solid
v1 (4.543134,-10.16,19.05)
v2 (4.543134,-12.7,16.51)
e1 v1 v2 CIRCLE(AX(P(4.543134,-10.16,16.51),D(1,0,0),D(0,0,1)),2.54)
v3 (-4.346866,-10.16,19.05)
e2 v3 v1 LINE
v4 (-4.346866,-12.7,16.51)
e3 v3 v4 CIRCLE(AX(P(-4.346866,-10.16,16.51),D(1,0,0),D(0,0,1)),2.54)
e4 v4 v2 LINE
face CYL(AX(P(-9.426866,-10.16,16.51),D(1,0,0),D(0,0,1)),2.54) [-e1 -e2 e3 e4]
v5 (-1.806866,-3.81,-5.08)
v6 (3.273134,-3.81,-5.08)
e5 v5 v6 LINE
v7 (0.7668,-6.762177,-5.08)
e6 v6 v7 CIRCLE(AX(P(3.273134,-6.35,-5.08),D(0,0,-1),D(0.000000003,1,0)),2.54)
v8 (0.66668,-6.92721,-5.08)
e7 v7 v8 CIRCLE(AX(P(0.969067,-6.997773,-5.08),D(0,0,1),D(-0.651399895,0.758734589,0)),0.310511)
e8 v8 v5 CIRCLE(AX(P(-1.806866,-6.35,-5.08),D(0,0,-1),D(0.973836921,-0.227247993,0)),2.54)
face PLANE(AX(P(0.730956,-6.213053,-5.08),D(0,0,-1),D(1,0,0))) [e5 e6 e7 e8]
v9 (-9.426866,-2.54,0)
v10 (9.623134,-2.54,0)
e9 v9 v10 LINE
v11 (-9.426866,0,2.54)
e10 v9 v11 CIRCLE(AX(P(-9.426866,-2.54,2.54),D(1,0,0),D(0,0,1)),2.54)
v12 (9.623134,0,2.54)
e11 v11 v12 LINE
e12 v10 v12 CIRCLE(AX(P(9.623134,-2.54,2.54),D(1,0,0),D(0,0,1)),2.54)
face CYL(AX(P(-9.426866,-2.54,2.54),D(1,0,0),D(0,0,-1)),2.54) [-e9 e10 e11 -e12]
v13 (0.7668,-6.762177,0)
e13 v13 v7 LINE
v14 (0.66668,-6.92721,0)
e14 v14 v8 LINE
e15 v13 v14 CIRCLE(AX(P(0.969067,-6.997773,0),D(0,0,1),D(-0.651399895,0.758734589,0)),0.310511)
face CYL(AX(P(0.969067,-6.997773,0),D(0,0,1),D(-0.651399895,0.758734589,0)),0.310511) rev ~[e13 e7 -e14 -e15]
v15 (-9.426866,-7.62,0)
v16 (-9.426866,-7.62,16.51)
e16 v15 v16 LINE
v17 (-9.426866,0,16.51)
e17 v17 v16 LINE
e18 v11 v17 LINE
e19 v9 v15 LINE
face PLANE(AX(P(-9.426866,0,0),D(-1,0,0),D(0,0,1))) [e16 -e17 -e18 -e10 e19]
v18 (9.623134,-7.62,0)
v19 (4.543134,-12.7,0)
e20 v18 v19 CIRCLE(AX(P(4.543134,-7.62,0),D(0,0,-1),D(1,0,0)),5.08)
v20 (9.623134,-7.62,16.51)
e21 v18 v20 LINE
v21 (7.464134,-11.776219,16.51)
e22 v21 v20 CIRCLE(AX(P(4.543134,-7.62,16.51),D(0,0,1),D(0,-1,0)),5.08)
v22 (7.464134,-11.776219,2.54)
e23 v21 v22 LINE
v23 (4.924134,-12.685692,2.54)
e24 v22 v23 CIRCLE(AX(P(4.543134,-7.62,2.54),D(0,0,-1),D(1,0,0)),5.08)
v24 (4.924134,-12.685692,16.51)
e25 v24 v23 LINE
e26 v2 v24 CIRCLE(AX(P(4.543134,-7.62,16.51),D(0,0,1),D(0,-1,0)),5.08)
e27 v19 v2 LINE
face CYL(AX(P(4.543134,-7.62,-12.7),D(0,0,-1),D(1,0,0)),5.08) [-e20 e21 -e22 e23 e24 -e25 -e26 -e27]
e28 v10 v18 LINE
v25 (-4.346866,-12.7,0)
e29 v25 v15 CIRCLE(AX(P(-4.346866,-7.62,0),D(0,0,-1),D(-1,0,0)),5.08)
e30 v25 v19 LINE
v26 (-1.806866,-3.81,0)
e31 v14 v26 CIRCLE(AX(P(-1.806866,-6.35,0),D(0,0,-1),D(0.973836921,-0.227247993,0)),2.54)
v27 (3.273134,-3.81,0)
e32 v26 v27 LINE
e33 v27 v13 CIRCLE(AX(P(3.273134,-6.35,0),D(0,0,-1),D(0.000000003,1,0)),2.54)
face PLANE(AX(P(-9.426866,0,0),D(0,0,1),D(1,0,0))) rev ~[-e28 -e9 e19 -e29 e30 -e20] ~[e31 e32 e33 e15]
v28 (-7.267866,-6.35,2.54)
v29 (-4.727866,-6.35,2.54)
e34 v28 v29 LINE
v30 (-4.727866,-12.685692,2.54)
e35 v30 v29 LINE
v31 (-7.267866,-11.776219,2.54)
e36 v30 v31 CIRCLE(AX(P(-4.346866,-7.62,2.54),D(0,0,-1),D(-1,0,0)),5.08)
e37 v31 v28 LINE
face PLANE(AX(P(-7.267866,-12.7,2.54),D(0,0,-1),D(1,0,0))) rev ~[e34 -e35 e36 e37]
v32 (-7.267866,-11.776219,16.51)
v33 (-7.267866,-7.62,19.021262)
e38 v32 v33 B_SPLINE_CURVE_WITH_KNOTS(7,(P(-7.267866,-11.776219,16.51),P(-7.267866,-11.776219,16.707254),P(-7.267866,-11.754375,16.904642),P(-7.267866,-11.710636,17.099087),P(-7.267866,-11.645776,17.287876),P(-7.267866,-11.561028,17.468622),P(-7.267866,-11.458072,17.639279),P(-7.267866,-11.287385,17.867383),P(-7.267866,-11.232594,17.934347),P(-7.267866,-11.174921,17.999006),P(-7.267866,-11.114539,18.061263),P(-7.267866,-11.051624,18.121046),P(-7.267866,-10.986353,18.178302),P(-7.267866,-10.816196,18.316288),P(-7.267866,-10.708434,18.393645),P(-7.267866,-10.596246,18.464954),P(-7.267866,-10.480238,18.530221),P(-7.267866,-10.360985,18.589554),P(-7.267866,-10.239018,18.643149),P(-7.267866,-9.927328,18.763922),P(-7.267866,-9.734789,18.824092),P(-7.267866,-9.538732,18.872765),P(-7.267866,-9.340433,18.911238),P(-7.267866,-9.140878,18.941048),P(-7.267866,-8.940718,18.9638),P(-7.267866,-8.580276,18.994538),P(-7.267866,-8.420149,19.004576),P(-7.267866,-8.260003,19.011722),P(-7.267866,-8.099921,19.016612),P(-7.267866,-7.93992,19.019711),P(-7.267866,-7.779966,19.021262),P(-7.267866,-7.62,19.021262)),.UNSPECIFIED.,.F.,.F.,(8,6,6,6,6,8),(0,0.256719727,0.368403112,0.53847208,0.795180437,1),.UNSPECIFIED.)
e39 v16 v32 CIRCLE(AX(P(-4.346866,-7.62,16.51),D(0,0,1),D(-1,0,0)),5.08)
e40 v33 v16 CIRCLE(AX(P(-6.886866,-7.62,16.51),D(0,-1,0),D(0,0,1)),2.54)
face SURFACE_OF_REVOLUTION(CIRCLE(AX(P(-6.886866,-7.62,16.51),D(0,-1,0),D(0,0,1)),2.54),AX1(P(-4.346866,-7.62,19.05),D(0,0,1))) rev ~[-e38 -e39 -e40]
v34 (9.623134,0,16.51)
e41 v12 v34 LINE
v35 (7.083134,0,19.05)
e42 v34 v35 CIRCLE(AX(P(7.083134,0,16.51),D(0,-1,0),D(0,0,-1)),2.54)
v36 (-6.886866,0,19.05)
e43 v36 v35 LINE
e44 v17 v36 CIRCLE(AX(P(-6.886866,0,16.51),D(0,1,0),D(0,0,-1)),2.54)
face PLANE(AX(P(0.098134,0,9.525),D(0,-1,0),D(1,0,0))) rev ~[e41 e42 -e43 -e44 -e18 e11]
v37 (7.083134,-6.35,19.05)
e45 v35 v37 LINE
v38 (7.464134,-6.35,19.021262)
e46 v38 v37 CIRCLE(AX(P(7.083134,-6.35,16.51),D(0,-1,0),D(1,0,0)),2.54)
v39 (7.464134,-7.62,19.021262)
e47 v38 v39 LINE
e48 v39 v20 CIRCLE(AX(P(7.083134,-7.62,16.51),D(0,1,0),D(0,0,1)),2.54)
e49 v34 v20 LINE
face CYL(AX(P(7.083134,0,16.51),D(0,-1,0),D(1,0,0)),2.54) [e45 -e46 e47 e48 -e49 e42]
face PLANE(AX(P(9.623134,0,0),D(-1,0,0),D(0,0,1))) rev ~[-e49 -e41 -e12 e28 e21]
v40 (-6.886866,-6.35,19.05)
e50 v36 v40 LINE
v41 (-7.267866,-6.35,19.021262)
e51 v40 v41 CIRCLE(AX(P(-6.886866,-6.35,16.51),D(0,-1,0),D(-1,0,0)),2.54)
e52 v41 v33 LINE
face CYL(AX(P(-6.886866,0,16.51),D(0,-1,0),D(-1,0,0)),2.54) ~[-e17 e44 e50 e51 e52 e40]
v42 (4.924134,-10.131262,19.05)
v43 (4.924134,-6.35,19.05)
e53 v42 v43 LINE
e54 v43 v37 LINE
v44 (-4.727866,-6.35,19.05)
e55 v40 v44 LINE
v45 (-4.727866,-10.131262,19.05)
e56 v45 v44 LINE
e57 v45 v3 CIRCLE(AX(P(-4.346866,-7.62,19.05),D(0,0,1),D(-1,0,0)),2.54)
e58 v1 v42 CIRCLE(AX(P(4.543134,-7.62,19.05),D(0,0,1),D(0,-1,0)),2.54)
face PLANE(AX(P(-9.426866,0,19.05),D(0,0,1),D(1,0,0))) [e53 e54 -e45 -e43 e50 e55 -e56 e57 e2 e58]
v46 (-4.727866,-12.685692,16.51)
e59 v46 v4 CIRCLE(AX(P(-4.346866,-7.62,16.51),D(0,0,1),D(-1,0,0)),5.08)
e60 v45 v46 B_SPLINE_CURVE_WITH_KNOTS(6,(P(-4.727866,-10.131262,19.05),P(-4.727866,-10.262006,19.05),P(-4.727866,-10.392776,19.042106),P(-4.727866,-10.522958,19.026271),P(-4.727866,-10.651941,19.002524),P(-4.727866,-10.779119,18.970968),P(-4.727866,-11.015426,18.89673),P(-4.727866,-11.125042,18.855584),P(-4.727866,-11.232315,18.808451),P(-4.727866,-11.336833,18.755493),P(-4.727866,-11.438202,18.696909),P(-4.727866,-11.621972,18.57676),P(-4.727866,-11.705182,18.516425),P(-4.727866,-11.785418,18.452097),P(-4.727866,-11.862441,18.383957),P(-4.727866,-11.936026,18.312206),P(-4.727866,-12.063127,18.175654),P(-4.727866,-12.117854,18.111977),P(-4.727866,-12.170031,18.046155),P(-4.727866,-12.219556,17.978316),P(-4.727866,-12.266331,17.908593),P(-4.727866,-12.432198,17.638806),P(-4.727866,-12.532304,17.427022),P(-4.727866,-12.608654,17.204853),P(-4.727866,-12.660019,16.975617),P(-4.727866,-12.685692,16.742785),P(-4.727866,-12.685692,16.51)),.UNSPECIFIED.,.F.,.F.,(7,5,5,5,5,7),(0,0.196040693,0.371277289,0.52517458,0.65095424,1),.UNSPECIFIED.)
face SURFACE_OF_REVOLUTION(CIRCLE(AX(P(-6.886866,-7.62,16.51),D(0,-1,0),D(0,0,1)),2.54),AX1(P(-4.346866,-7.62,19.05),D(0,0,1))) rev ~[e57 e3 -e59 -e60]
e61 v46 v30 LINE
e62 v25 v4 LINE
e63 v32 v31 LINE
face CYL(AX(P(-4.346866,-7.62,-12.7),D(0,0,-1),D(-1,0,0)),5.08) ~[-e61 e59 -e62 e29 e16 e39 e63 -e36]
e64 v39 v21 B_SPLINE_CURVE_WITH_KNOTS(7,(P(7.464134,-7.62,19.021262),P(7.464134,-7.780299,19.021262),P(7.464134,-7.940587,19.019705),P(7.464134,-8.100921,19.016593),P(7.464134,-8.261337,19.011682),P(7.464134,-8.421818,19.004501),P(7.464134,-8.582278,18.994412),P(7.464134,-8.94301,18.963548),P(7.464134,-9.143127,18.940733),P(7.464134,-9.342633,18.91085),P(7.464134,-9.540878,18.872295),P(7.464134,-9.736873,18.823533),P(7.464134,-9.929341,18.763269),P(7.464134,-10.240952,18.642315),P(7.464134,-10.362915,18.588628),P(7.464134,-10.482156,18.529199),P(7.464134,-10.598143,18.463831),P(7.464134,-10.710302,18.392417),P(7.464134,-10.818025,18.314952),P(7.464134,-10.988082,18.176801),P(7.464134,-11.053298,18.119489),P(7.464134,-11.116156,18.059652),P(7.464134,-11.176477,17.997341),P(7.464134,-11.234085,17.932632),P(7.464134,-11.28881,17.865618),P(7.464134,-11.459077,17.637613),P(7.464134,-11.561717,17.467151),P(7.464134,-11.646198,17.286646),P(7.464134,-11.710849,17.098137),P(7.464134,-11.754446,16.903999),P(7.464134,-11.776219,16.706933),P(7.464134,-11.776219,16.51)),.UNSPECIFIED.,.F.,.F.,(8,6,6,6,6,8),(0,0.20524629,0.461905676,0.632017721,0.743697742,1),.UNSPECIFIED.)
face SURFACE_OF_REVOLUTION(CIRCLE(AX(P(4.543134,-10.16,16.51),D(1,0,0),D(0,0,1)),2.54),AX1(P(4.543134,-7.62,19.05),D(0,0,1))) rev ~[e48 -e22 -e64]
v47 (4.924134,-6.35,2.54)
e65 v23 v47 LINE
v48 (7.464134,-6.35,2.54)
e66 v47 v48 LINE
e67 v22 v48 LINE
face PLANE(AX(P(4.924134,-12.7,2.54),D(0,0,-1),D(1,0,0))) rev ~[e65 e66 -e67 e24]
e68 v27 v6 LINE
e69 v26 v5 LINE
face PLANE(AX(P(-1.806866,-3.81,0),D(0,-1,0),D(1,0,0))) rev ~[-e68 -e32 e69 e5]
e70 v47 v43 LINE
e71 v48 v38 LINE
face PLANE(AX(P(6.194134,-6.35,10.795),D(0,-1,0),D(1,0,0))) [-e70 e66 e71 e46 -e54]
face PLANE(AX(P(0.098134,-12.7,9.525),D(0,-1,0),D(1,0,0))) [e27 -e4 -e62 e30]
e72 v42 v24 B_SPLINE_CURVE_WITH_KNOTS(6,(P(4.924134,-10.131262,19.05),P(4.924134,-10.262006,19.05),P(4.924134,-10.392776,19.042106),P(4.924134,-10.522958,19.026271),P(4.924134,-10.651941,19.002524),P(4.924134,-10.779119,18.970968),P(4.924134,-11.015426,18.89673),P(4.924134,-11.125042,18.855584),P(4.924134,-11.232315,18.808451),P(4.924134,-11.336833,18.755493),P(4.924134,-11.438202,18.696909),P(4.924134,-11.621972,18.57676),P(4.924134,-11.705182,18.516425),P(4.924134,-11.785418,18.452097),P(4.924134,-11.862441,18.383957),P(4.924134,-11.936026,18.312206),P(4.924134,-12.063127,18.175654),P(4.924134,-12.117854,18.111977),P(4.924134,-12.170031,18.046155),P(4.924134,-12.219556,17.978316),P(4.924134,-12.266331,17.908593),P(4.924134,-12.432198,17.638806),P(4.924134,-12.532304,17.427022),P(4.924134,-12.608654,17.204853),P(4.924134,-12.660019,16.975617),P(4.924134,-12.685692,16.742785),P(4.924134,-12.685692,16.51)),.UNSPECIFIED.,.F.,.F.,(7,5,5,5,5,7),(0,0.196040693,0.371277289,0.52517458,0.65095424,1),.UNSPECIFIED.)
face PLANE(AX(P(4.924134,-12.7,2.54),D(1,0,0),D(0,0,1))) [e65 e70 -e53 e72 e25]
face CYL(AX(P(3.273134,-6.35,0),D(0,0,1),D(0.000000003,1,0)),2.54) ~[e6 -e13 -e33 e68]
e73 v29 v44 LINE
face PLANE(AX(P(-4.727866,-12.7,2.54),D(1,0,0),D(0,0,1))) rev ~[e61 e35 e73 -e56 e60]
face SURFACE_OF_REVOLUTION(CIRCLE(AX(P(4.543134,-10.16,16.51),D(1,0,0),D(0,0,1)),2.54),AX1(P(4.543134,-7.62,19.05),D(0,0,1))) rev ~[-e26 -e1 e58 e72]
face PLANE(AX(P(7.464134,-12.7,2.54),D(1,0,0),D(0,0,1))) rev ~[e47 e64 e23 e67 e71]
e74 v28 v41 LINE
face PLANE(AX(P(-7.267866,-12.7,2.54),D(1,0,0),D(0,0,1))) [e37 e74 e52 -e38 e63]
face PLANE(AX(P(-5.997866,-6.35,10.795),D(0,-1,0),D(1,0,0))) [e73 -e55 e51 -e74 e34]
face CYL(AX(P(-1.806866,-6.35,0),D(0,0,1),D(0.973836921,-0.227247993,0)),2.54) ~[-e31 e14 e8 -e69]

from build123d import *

# Parameters (mm, degrees)
F0_W        = 19.05
F0_H        = 19.05
F1_DEPTH    = 12.7
F2_R        = 2.54
F3_T1_DEPTH = 31.75
F3_T4_ANGLE = 90
F3_T6_ANGLE = 90
F5_W        = 2.54
F5_H        = 16.51
F6_DEPTH    = 6.35
F7_R        = 2.54
F9_DEPTH    = 5.08


# Not quite as in the source:
# - a fillet or chamfer that OpenCascade refuses, or shapes differently, is made with other operations: its cross-section is extruded or revolved along the edge and cut away or added


with BuildPart() as f1:
    # F0 (on Front) → F1 (new body)
    with BuildSketch(Plane.XZ):
        with Locations((0.0981341409, 9.525)):
            Rectangle(F0_W, F0_H)
    extrude(amount=F1_DEPTH)

    # F2
    f2_edges = [f1.edges().sort_by_distance(p)[0] for p in [
        (9.623134, -6.35, 19.05),
        (-9.426866, -6.35, 19.05),
        (0.098134, -12.7, 19.05),
    ]]
    fillet(f2_edges, radius=F2_R)

    # F3: fillet of radius 5.08 on 2 edges, made by hand

    # F3_s2 → F3_t1 (cut)
    with BuildSketch(Plane.XY.offset(-12.7)):
        with BuildLine():
            ThreePointArc((9.6231341409, -7.62), (8.1352365894, -11.2121024484), (4.5431341409, -12.7))
            Line((4.5431341409, -12.7), (9.6231341409, -12.7))
            Line((9.6231341409, -12.7), (9.6231341409, -7.62))
        make_face()
        with BuildLine():
            ThreePointArc((-9.4268658591, -7.62), (-7.9389683075, -11.2121024484), (-4.3468658591, -12.7))
            Line((-4.3468658591, -12.7), (-9.4268658591, -12.7))
            Line((-9.4268658591, -12.7), (-9.4268658591, -7.62))
        make_face()
    extrude(amount=F3_T1_DEPTH, mode=Mode.SUBTRACT)

    # F3_s3 → F3_t4 (revolve, cut)
    with BuildSketch(Plane.XZ.offset(7.62)):
        with BuildLine():
            ThreePointArc((-6.8868658591, 19.05), (-8.6829170833, 18.3060512242), (-9.4268658591, 16.51))
            Line((-9.4268658591, 16.51), (-9.4268658591, 19.05))
            Line((-9.4268658591, 19.05), (-6.8868658591, 19.05))
        make_face()
    revolve(axis=Axis((-4.3468658591, -7.62, 19.05), (0, 0, 1)), revolution_arc=F3_T4_ANGLE, mode=Mode.SUBTRACT)

    # F3_s5 → F3_t6 (revolve, cut)
    with BuildSketch(Plane.YZ.offset(4.5431341409)):
        with BuildLine():
            ThreePointArc((-10.16, 19.05), (-11.9560512242, 18.3060512242), (-12.7, 16.51))
            Line((-12.7, 16.51), (-12.7, 19.05))
            Line((-12.7, 19.05), (-10.16, 19.05))
        make_face()
    revolve(axis=Axis((4.5431341409, -7.62, 19.05), (0, 0, 1)), revolution_arc=F3_T6_ANGLE, mode=Mode.SUBTRACT)

    # F5 (on offset) → F6 (cut)
    with BuildSketch(Plane.XZ.offset(12.7)):
        with Locations((-5.9978658591, 10.795)):
            Rectangle(F5_W, F5_H)
        with Locations((6.1941341409, 10.795)):
            Rectangle(F5_W, F5_H)
    extrude(amount=-F6_DEPTH, mode=Mode.SUBTRACT)

    # F7
    f7_edges = [f1.edges().sort_by_distance(p)[0] for p in [
        (0.098134, 0, 0),
    ]]
    fillet(f7_edges, radius=F7_R)

    # F8 (on face) → F9 (join)
    with BuildSketch(Plane(origin=(0, 0, 0), x_dir=(1, 0, 0), z_dir=(0, 0, -1))):
        with BuildLine():
            ThreePointArc((0.7668002065, 6.7621773998), (0.7035904263, 6.8367161594), (0.6666799214, 6.927209903))
            ThreePointArc((0.6666799214, 6.927209903), (-3.7965534166, 7.9288424314), (-1.8068658591, 3.81))
            Line((-1.8068658591, 3.81), (3.2731341493, 3.81))
            ThreePointArc((3.2731341493, 3.81), (5.2094361027, 7.9938779495), (0.7668002065, 6.7621773998))
        make_face()
    extrude(amount=F9_DEPTH)


solid = f1.part
